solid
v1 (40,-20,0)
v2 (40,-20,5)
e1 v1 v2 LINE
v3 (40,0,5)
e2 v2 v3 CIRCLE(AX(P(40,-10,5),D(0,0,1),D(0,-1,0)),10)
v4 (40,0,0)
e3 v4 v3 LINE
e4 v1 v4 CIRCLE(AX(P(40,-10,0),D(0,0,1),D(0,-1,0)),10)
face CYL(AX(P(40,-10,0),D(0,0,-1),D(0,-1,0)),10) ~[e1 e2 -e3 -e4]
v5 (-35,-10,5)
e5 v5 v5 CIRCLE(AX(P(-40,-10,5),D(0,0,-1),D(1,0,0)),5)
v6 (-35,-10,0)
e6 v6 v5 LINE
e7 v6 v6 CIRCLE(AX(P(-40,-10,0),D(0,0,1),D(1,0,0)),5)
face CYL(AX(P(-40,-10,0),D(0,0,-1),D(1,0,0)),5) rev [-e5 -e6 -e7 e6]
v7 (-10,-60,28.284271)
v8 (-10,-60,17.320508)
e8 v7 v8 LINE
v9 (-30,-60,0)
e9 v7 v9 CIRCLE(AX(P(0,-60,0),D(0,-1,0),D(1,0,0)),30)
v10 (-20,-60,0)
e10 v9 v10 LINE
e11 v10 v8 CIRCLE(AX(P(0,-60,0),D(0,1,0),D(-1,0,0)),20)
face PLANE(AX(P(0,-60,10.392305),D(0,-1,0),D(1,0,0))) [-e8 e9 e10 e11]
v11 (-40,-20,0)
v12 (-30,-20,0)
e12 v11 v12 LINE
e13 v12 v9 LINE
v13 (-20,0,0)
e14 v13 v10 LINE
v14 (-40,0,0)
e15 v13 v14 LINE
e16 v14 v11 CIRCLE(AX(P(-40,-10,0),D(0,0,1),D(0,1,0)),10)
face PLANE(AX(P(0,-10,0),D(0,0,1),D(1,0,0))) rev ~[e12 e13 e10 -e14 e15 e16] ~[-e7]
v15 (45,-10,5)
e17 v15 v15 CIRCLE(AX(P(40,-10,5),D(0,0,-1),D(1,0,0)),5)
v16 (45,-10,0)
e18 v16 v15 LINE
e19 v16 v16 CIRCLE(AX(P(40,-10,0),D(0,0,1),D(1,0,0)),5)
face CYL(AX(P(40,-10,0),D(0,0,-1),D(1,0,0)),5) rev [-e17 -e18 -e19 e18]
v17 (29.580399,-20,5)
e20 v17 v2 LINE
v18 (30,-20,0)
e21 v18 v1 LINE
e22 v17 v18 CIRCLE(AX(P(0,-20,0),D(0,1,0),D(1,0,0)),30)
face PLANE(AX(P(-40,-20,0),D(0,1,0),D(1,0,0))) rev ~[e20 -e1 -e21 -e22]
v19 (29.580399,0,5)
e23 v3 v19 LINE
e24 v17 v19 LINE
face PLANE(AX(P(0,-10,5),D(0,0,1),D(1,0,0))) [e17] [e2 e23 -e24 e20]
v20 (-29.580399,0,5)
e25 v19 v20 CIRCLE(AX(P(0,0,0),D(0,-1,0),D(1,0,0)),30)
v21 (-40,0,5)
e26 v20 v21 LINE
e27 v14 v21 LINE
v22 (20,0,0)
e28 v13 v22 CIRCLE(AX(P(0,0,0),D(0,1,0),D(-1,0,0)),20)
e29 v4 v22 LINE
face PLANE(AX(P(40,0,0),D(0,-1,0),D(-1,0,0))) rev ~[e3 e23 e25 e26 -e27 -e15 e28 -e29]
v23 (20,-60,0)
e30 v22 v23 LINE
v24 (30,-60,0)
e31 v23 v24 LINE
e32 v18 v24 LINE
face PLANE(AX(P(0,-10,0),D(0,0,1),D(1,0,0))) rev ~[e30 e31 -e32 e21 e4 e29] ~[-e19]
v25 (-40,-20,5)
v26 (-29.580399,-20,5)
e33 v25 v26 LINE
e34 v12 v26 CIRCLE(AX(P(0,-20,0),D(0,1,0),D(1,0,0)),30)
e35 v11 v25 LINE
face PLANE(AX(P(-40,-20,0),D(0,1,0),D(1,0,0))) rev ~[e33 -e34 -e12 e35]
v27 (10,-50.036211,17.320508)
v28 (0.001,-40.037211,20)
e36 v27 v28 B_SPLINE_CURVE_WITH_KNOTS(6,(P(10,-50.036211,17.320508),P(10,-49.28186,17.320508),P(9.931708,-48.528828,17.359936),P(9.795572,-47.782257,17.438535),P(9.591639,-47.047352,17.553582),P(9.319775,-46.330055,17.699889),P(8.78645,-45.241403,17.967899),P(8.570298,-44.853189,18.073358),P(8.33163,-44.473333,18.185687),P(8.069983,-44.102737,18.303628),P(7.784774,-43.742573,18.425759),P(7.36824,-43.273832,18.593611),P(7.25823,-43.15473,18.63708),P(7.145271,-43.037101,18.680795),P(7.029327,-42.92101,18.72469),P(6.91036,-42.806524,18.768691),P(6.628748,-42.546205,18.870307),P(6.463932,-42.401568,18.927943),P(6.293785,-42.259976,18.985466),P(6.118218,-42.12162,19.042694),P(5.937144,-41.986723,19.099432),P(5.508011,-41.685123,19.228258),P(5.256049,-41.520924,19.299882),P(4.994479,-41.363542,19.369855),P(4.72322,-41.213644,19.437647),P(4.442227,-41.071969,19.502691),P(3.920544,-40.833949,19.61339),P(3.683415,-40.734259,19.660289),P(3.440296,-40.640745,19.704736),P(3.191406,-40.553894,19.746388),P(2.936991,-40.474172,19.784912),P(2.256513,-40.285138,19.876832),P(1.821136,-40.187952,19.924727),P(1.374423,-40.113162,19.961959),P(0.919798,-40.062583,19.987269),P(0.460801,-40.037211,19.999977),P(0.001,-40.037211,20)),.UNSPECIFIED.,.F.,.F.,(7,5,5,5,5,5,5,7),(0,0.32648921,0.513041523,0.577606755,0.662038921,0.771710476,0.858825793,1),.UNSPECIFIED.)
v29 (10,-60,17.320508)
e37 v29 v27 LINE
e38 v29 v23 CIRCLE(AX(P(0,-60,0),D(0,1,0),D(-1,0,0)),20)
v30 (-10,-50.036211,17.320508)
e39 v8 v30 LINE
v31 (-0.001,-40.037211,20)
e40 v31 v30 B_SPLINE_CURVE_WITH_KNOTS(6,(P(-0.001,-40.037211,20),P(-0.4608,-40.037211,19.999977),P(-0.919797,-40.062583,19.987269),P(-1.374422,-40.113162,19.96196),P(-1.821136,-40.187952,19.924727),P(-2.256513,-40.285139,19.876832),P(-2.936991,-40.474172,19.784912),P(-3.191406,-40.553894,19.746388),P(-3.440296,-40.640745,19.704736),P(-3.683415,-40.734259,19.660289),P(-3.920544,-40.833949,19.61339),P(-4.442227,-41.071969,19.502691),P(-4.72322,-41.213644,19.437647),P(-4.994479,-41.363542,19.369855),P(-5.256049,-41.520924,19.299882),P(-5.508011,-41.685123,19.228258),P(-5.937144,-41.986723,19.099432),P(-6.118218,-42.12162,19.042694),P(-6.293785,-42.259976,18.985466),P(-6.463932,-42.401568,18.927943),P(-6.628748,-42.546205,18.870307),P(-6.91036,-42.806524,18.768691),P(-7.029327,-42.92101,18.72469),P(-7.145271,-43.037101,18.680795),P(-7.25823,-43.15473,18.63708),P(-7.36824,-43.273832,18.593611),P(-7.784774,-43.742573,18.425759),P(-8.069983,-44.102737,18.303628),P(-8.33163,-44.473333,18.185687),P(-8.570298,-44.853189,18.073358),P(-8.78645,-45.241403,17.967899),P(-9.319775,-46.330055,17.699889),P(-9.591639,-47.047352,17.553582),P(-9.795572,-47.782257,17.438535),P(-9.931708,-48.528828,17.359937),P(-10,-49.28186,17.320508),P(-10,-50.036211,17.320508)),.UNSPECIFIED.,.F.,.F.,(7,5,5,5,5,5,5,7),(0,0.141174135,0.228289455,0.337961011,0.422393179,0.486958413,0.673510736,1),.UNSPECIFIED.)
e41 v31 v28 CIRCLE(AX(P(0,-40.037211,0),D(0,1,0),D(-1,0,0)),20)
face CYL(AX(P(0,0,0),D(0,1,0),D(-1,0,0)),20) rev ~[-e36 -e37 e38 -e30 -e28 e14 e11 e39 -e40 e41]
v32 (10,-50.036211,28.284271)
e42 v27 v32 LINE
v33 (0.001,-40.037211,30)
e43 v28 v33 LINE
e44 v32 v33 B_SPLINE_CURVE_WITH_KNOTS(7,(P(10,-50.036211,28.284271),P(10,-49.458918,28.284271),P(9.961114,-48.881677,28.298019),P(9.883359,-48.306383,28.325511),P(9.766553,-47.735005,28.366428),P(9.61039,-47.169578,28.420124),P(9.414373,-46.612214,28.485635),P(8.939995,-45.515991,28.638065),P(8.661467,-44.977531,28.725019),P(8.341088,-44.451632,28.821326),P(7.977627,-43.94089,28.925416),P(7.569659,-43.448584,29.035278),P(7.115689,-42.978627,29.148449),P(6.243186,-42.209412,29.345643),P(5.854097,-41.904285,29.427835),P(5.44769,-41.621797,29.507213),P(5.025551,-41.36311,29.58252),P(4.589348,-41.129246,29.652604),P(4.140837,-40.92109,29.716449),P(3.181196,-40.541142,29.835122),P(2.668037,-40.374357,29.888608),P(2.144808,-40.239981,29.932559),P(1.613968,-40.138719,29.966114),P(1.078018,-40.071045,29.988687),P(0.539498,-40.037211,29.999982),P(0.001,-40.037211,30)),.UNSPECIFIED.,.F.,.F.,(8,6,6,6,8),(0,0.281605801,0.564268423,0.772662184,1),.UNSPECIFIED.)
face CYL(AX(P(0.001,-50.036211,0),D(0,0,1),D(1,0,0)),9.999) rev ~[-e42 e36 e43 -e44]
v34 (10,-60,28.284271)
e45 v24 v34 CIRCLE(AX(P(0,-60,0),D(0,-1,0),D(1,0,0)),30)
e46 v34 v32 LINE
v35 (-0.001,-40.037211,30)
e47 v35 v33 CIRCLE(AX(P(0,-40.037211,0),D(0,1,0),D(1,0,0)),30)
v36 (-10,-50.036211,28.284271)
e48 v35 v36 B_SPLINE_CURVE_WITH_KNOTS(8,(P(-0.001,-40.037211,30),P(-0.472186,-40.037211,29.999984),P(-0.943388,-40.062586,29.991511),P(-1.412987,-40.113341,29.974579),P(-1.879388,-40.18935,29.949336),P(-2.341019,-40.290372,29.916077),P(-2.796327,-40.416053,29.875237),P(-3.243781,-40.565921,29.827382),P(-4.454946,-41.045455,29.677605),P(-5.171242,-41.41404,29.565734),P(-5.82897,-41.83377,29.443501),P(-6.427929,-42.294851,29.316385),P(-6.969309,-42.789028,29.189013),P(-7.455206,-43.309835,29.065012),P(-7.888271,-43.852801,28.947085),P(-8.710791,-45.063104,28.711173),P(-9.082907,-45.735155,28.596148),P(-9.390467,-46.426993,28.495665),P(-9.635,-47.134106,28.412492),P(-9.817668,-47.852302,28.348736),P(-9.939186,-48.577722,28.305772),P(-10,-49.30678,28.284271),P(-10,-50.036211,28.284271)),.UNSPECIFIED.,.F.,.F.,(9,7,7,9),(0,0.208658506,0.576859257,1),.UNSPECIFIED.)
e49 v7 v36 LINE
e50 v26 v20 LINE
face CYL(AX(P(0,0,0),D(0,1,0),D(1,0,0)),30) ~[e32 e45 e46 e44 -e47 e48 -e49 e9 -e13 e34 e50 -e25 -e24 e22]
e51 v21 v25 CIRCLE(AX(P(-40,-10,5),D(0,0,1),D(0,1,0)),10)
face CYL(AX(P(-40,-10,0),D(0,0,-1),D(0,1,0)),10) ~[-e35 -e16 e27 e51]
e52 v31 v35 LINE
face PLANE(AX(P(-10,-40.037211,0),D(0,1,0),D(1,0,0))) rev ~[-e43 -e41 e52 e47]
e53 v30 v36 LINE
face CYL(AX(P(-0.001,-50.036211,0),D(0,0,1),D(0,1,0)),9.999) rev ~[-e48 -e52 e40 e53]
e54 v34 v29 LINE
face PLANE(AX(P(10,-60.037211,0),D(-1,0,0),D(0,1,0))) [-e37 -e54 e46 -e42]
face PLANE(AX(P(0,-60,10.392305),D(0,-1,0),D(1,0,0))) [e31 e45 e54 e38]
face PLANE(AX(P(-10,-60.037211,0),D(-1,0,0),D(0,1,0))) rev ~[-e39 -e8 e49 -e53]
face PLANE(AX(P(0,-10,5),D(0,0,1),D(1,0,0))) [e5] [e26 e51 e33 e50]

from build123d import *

# Parameters (mm, degrees)
F1_DEPTH  = 60
F3_DEPTH  = 5
F4_R      = 5
F5_DEPTH  = 30.001
F6_W      = 20
F6_H      = 20
F7_DEPTH  = 30.001
F8_R      = 9.999
F10_DEPTH = 60.0010001


# Not quite as in the source:
# - a fillet or chamfer is up to 0.001 mm smaller than in the source, because OpenCascade refuses the exact size


with BuildPart() as f1:
    # F0 (on Front) → F1 (new body)
    with BuildSketch(Plane.XZ):
        with BuildLine():
            Line((-30, 0), (30, 0))
            ThreePointArc((30, 0), (0, 30), (-30, 0))
        make_face()
    extrude(amount=F1_DEPTH)

    # F2 (on Top) → F3 (join)
    with BuildSketch(Plane.XY):
        with BuildLine():
            Line((40, 0), (-40, 0))
            ThreePointArc((-40, 0), (-50, -10), (-40, -20))
            Line((-40, -20), (40, -20))
            ThreePointArc((40, -20), (50, -10), (40, 0))
        make_face()
    extrude(amount=F3_DEPTH)

    # F4 (on Top) → F5 (cut, through all)
    with BuildSketch(Plane.XY):
        with Locations((-40, -10)):
            Circle(F4_R)
        with Locations((40, -10)):
            Circle(F4_R)
    extrude(amount=F5_DEPTH, mode=Mode.SUBTRACT)

    # F6 (on Top) → F7 (cut, through all)
    with BuildSketch(Plane.XY):
        with Locations((0, -50.0372105837)):
            Rectangle(F6_W, F6_H)
    extrude(amount=F7_DEPTH, mode=Mode.SUBTRACT)

    # F8 (radius 10 in the source; OpenCascade refuses exactly that, so slightly less here)
    f8_edges = [f1.edges().sort_by_distance(p)[0] for p in [
        (-10, -40.037211, 14.142136),
        (10, -40.037211, 14.142136),
    ]]
    fillet(f8_edges, radius=F8_R)

    # F9 (on face) → F10 (cut, through all)
    with BuildSketch(Plane(origin=(0, 0, 0), x_dir=(-1, 0, 0), z_dir=(0, 1, 0))):
        with BuildLine():
            Line((-20, 0), (20, 0))
            ThreePointArc((20, 0), (0, 20), (-20, 0))
        make_face()
    extrude(amount=-F10_DEPTH, mode=Mode.SUBTRACT)


solid = f1.part
